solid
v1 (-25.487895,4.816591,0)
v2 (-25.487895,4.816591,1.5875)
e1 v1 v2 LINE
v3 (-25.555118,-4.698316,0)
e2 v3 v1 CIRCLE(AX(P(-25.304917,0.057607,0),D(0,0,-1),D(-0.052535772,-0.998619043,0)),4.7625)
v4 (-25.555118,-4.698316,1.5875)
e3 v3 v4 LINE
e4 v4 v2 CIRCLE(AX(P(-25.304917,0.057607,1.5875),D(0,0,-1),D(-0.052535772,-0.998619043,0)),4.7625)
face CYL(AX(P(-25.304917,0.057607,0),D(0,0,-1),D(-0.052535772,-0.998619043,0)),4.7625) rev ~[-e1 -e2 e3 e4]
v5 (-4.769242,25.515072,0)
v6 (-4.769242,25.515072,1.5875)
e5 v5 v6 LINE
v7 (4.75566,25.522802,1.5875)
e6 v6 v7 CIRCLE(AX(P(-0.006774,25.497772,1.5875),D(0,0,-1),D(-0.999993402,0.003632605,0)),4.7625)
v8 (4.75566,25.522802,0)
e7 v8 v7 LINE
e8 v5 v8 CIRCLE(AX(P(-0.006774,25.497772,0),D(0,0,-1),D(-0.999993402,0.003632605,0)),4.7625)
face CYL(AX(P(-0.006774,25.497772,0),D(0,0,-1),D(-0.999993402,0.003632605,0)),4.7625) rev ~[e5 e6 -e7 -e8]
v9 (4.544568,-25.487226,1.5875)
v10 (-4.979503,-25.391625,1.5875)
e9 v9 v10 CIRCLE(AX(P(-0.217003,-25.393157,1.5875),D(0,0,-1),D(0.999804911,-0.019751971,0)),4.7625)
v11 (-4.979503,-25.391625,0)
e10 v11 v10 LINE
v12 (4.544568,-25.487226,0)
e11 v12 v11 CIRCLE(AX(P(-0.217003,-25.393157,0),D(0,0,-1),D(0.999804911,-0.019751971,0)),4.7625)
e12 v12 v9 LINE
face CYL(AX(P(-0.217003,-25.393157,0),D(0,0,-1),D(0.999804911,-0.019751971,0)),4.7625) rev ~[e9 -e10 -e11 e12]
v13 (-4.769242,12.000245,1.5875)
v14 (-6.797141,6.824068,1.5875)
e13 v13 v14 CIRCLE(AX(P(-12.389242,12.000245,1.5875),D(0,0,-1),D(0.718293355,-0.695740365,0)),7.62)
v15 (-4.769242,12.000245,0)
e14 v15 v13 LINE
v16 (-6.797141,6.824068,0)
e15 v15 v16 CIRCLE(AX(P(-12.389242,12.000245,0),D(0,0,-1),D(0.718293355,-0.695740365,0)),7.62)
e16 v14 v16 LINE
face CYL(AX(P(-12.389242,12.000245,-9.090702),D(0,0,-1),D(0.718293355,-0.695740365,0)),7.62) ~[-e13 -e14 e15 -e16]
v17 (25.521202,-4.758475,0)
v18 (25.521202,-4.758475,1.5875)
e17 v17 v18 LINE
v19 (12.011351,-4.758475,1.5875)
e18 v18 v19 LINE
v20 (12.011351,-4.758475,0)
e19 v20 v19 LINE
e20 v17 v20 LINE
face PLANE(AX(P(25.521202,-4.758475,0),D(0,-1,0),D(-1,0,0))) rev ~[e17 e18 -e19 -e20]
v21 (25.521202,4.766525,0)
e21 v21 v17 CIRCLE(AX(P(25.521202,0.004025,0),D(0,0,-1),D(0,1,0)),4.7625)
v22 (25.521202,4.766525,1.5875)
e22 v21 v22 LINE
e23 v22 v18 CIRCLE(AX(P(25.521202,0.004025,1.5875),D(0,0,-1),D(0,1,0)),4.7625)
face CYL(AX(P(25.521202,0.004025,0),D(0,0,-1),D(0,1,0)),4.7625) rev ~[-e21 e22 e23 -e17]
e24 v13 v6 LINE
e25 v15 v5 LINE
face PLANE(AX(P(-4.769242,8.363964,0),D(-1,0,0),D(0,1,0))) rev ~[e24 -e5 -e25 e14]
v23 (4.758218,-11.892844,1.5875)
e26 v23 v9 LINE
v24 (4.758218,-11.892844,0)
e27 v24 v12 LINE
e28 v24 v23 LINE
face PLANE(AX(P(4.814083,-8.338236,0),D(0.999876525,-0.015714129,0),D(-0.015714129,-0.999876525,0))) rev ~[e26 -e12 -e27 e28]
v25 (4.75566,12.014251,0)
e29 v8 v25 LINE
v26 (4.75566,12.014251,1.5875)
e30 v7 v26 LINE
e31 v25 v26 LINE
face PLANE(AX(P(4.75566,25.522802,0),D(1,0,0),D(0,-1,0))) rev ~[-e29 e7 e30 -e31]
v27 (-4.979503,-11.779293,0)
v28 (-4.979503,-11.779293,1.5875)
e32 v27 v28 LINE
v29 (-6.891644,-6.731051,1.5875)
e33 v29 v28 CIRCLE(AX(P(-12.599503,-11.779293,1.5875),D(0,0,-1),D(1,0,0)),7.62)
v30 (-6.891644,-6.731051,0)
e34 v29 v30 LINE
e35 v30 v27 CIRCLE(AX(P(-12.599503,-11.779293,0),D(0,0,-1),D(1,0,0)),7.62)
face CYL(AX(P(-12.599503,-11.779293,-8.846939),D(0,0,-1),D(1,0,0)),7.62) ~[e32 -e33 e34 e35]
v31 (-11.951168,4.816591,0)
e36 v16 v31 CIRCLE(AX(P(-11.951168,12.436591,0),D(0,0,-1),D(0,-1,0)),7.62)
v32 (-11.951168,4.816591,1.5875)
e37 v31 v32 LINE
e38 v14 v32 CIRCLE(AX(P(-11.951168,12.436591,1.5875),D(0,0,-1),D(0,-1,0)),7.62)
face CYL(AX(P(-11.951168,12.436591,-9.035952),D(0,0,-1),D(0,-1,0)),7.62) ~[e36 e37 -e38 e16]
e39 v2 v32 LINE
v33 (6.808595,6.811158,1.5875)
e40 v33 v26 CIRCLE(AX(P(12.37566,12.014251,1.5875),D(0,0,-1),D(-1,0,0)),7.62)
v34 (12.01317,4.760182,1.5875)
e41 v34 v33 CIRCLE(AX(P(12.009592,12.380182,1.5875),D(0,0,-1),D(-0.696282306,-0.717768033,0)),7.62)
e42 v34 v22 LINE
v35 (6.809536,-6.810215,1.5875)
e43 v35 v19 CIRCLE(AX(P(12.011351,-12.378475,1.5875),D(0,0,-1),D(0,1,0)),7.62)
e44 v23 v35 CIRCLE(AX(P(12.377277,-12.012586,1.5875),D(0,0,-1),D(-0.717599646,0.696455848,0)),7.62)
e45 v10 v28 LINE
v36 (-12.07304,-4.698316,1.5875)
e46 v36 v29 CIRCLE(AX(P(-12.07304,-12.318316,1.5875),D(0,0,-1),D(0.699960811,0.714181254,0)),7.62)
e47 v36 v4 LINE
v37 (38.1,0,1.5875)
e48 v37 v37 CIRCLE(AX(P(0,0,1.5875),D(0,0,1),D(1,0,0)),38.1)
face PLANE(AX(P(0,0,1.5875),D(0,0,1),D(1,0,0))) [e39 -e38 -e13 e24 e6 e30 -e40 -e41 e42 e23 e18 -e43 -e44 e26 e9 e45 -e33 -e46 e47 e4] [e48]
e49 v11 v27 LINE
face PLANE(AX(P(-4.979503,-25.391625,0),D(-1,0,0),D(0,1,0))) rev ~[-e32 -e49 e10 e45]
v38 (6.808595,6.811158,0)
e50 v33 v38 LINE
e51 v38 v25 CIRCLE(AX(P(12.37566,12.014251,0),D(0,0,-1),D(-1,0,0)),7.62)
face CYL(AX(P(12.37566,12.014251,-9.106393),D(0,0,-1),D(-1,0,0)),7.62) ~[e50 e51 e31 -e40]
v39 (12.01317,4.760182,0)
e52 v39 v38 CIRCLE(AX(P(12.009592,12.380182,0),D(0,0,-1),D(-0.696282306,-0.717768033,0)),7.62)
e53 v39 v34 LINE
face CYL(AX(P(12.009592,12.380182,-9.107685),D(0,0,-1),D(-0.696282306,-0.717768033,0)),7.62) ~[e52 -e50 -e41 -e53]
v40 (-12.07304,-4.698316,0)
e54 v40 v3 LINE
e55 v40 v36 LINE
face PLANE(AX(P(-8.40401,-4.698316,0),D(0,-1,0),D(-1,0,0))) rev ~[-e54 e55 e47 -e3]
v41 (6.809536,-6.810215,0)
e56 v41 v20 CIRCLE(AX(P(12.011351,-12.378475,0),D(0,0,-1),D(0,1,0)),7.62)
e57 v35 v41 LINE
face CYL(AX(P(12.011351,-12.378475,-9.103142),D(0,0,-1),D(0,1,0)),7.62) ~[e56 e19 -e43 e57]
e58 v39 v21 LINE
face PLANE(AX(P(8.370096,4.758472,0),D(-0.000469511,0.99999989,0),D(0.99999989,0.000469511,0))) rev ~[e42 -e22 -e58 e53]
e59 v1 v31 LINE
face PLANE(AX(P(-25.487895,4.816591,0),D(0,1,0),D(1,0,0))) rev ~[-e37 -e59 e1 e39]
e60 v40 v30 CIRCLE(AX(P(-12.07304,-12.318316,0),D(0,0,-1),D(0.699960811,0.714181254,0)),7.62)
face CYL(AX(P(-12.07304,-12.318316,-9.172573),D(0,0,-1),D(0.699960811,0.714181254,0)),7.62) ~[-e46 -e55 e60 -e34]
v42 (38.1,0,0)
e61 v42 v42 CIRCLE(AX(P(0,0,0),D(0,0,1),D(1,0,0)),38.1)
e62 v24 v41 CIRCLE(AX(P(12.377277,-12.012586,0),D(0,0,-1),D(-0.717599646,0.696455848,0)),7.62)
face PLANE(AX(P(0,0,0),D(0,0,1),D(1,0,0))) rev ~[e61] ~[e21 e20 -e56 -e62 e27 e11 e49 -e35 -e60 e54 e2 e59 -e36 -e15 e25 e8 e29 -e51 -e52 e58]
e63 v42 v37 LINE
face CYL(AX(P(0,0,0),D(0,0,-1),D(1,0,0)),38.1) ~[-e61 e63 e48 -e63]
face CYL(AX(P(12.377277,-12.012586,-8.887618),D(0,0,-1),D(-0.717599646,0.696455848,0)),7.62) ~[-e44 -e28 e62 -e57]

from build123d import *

# Parameters (mm, degrees)
F0_R         = 38.1
F1_DEPTH     = 1.5875
F2_T1_DEPTH  = 19.6594045054
F2_T3_DEPTH  = 19.7689044348
F2_T5_DEPTH  = 19.8002867112
F2_T7_DEPTH  = 19.8028708993
F2_T9_DEPTH  = 19.7937834769
F2_T11_DEPTH = 19.3627357335
F2_T13_DEPTH = 19.2813787557
F2_T15_DEPTH = 19.9326468644


# Not quite as in the source:
# - a fillet or chamfer that OpenCascade refuses, or shapes differently, is made with other operations: its cross-section is extruded or revolved along the edge and cut away or added


with BuildPart() as f1:
    # F0 (on Top) → F1 (new body)
    with BuildSketch(Plane.XY):
        Circle(F0_R)
        with BuildLine():
            ThreePointArc((25.5212023113, 4.7665246553), (30.2837023113, 0.0040246553), (25.5212023113, -4.7584753447))
            Line((25.5212023113, -4.7584753447), (8.3700942824, -4.7584753447))
            ThreePointArc((8.3700942824, -4.7584753447), (6.8307613912, -6.7854450641), (4.8140826203, -8.3382356902))
            Line((4.8140826203, -8.3382356902), (4.5445678914, -25.4872259938))
            ThreePointArc((4.5445678914, -25.4872259938), (-0.2648058004, -30.1554173191), (-4.9795027497, -25.3916248979))
            Line((-4.9795027497, -25.3916248979), (-4.9795027497, -8.2405168689))
            ThreePointArc((-4.9795027497, -8.2405168689), (-6.9221674375, -6.692171835), (-8.4040103572, -4.6983162748))
            Line((-8.4040103572, -4.6983162748), (-25.5551183861, -4.6983162748))
            ThreePointArc((-25.5551183861, -4.6983162748), (-30.0672979191, 0.0912532901), (-25.4878952685, 4.8165905393))
            Line((-25.4878952685, 4.8165905393), (-8.3367872396, 4.8165905393))
            ThreePointArc((-8.3367872396, 4.8165905393), (-6.7888119889, 6.8274151536), (-4.7692424862, 8.3639638934))
            Line((-4.7692424862, 8.3639638934), (-4.7692424862, 25.5150719223))
            ThreePointArc((-4.7692424862, 25.5150719223), (-0.0106390137, 30.260270074), (4.7556603142, 25.5228020557))
            Line((4.7556603142, 25.5228020557), (4.7556603142, 8.3716940268))
            ThreePointArc((4.7556603142, 8.3716940268), (6.8069974407, 6.8092842314), (8.3700961728, 4.7584720195))
            Line((8.3700961728, 4.7584720195), (25.5212023113, 4.7665246553))
        make_face(mode=Mode.SUBTRACT)
    extrude(amount=F1_DEPTH)

    # F2: fillet of radius 7.62 on 8 edges, made by hand

    # F2_s2 → F2_t1 (cut)
    with BuildSketch(Plane.XY.offset(-9.0359522527)):
        with BuildLine():
            ThreePointArc((-11.9511681406, 4.8165905393), (-9.1053172731, 5.3679603439), (-6.6713079375, 6.9422774581))
            ThreePointArc((-6.6713079375, 6.9422774581), (-7.5789423028, 5.9381141343), (-8.3367872396, 4.8165905393))
            Line((-8.3367872396, 4.8165905393), (-11.9511681406, 4.8165905393))
        make_face()
    extrude(amount=F2_T1_DEPTH, mode=Mode.SUBTRACT)

    # F2_s4 → F2_t3 (cut)
    with BuildSketch(Plane.XY.offset(-9.0907022174)):
        with BuildLine():
            ThreePointArc((-6.9158471176, 6.6987031989), (-5.3262518764, 9.1404259669), (-4.7692424862, 12.0002447803))
            Line((-4.7692424862, 12.0002447803), (-4.7692424862, 8.3639638934))
            ThreePointArc((-4.7692424862, 8.3639638934), (-5.9015763197, 7.607428136), (-6.9158471176, 6.6987031989))
        make_face()
    extrude(amount=F2_T3_DEPTH, mode=Mode.SUBTRACT)

    # F2_s6 → F2_t5 (cut)
    with BuildSketch(Plane.XY.offset(-9.1063933556)):
        with BuildLine():
            ThreePointArc((4.7556603142, 12.014251369), (5.3142882964, 9.1504383117), (6.9082653607, 6.7065218711))
            ThreePointArc((6.9082653607, 6.7065218711), (5.8910941356, 7.615548292), (4.7556603142, 8.3716940268))
            Line((4.7556603142, 8.3716940268), (4.7556603142, 12.014251369))
        make_face()
    extrude(amount=F2_T5_DEPTH, mode=Mode.SUBTRACT)

    # F2_s8 → F2_t7 (cut)
    with BuildSketch(Plane.XY.offset(-9.1076854497)):
        with BuildLine():
            ThreePointArc((6.703921101, 6.9107892294), (9.1487661341, 5.3175989867), (12.0131699511, 4.7601824833))
            Line((12.0131699511, 4.7601824833), (8.3700961728, 4.7584720195))
            ThreePointArc((8.3700961728, 4.7584720195), (7.6134497132, 5.893806017), (6.703921101, 6.9107892294))
        make_face()
    extrude(amount=F2_T7_DEPTH, mode=Mode.SUBTRACT)

    # F2_s10 → F2_t9 (cut)
    with BuildSketch(Plane.XY.offset(-9.1031417385)):
        with BuildLine():
            ThreePointArc((12.0113509777, -4.7584753447), (9.1483653066, -5.3167678283), (6.7049028325, -6.9098367498))
            ThreePointArc((6.7049028325, -6.9098367498), (7.6138671828, -5.8932667023), (8.3700942824, -4.7584753447))
            Line((8.3700942824, -4.7584753447), (12.0113509777, -4.7584753447))
        make_face()
    extrude(amount=F2_T9_DEPTH, mode=Mode.SUBTRACT)

    # F2_s12 → F2_t11 (cut)
    with BuildSketch(Plane.XY.offset(-8.8876178667)):
        with BuildLine():
            ThreePointArc((6.90916797, -6.7055919846), (5.3384286521, -9.0938512154), (4.7582181499, -11.8928438791))
            Line((4.7582181499, -11.8928438791), (4.8140826203, -8.3382356902))
            ThreePointArc((4.8140826203, -8.3382356902), (5.9181950346, -7.5945067933), (6.90916797, -6.7055919846))
        make_face()
    extrude(amount=F2_T11_DEPTH, mode=Mode.SUBTRACT)

    # F2_s14 → F2_t13 (cut)
    with BuildSketch(Plane.XY.offset(-8.8469393778)):
        with BuildLine():
            ThreePointArc((-4.9795027497, -11.7792926201), (-5.5115025024, -8.9820345887), (-7.0332173151, -6.5753646363))
            ThreePointArc((-7.0332173151, -6.5753646363), (-6.06378956, -7.478771428), (-4.9795027497, -8.2405168689))
            Line((-4.9795027497, -8.2405168689), (-4.9795027497, -11.7792926201))
        make_face()
    extrude(amount=F2_T13_DEPTH, mode=Mode.SUBTRACT)

    # F2_s16 → F2_t15 (cut)
    with BuildSketch(Plane.XY.offset(-9.1725734322)):
        with BuildLine():
            ThreePointArc((-6.7393383503, -6.8762551219), (-9.1924239959, -5.2637820597), (-12.0730397301, -4.6983162748))
            Line((-12.0730397301, -4.6983162748), (-8.4040103572, -4.6983162748))
            ThreePointArc((-8.4040103572, -4.6983162748), (-7.6495821405, -5.8468332435), (-6.7393383503, -6.8762551219))
        make_face()
    extrude(amount=F2_T15_DEPTH, mode=Mode.SUBTRACT)


solid = f1.part
